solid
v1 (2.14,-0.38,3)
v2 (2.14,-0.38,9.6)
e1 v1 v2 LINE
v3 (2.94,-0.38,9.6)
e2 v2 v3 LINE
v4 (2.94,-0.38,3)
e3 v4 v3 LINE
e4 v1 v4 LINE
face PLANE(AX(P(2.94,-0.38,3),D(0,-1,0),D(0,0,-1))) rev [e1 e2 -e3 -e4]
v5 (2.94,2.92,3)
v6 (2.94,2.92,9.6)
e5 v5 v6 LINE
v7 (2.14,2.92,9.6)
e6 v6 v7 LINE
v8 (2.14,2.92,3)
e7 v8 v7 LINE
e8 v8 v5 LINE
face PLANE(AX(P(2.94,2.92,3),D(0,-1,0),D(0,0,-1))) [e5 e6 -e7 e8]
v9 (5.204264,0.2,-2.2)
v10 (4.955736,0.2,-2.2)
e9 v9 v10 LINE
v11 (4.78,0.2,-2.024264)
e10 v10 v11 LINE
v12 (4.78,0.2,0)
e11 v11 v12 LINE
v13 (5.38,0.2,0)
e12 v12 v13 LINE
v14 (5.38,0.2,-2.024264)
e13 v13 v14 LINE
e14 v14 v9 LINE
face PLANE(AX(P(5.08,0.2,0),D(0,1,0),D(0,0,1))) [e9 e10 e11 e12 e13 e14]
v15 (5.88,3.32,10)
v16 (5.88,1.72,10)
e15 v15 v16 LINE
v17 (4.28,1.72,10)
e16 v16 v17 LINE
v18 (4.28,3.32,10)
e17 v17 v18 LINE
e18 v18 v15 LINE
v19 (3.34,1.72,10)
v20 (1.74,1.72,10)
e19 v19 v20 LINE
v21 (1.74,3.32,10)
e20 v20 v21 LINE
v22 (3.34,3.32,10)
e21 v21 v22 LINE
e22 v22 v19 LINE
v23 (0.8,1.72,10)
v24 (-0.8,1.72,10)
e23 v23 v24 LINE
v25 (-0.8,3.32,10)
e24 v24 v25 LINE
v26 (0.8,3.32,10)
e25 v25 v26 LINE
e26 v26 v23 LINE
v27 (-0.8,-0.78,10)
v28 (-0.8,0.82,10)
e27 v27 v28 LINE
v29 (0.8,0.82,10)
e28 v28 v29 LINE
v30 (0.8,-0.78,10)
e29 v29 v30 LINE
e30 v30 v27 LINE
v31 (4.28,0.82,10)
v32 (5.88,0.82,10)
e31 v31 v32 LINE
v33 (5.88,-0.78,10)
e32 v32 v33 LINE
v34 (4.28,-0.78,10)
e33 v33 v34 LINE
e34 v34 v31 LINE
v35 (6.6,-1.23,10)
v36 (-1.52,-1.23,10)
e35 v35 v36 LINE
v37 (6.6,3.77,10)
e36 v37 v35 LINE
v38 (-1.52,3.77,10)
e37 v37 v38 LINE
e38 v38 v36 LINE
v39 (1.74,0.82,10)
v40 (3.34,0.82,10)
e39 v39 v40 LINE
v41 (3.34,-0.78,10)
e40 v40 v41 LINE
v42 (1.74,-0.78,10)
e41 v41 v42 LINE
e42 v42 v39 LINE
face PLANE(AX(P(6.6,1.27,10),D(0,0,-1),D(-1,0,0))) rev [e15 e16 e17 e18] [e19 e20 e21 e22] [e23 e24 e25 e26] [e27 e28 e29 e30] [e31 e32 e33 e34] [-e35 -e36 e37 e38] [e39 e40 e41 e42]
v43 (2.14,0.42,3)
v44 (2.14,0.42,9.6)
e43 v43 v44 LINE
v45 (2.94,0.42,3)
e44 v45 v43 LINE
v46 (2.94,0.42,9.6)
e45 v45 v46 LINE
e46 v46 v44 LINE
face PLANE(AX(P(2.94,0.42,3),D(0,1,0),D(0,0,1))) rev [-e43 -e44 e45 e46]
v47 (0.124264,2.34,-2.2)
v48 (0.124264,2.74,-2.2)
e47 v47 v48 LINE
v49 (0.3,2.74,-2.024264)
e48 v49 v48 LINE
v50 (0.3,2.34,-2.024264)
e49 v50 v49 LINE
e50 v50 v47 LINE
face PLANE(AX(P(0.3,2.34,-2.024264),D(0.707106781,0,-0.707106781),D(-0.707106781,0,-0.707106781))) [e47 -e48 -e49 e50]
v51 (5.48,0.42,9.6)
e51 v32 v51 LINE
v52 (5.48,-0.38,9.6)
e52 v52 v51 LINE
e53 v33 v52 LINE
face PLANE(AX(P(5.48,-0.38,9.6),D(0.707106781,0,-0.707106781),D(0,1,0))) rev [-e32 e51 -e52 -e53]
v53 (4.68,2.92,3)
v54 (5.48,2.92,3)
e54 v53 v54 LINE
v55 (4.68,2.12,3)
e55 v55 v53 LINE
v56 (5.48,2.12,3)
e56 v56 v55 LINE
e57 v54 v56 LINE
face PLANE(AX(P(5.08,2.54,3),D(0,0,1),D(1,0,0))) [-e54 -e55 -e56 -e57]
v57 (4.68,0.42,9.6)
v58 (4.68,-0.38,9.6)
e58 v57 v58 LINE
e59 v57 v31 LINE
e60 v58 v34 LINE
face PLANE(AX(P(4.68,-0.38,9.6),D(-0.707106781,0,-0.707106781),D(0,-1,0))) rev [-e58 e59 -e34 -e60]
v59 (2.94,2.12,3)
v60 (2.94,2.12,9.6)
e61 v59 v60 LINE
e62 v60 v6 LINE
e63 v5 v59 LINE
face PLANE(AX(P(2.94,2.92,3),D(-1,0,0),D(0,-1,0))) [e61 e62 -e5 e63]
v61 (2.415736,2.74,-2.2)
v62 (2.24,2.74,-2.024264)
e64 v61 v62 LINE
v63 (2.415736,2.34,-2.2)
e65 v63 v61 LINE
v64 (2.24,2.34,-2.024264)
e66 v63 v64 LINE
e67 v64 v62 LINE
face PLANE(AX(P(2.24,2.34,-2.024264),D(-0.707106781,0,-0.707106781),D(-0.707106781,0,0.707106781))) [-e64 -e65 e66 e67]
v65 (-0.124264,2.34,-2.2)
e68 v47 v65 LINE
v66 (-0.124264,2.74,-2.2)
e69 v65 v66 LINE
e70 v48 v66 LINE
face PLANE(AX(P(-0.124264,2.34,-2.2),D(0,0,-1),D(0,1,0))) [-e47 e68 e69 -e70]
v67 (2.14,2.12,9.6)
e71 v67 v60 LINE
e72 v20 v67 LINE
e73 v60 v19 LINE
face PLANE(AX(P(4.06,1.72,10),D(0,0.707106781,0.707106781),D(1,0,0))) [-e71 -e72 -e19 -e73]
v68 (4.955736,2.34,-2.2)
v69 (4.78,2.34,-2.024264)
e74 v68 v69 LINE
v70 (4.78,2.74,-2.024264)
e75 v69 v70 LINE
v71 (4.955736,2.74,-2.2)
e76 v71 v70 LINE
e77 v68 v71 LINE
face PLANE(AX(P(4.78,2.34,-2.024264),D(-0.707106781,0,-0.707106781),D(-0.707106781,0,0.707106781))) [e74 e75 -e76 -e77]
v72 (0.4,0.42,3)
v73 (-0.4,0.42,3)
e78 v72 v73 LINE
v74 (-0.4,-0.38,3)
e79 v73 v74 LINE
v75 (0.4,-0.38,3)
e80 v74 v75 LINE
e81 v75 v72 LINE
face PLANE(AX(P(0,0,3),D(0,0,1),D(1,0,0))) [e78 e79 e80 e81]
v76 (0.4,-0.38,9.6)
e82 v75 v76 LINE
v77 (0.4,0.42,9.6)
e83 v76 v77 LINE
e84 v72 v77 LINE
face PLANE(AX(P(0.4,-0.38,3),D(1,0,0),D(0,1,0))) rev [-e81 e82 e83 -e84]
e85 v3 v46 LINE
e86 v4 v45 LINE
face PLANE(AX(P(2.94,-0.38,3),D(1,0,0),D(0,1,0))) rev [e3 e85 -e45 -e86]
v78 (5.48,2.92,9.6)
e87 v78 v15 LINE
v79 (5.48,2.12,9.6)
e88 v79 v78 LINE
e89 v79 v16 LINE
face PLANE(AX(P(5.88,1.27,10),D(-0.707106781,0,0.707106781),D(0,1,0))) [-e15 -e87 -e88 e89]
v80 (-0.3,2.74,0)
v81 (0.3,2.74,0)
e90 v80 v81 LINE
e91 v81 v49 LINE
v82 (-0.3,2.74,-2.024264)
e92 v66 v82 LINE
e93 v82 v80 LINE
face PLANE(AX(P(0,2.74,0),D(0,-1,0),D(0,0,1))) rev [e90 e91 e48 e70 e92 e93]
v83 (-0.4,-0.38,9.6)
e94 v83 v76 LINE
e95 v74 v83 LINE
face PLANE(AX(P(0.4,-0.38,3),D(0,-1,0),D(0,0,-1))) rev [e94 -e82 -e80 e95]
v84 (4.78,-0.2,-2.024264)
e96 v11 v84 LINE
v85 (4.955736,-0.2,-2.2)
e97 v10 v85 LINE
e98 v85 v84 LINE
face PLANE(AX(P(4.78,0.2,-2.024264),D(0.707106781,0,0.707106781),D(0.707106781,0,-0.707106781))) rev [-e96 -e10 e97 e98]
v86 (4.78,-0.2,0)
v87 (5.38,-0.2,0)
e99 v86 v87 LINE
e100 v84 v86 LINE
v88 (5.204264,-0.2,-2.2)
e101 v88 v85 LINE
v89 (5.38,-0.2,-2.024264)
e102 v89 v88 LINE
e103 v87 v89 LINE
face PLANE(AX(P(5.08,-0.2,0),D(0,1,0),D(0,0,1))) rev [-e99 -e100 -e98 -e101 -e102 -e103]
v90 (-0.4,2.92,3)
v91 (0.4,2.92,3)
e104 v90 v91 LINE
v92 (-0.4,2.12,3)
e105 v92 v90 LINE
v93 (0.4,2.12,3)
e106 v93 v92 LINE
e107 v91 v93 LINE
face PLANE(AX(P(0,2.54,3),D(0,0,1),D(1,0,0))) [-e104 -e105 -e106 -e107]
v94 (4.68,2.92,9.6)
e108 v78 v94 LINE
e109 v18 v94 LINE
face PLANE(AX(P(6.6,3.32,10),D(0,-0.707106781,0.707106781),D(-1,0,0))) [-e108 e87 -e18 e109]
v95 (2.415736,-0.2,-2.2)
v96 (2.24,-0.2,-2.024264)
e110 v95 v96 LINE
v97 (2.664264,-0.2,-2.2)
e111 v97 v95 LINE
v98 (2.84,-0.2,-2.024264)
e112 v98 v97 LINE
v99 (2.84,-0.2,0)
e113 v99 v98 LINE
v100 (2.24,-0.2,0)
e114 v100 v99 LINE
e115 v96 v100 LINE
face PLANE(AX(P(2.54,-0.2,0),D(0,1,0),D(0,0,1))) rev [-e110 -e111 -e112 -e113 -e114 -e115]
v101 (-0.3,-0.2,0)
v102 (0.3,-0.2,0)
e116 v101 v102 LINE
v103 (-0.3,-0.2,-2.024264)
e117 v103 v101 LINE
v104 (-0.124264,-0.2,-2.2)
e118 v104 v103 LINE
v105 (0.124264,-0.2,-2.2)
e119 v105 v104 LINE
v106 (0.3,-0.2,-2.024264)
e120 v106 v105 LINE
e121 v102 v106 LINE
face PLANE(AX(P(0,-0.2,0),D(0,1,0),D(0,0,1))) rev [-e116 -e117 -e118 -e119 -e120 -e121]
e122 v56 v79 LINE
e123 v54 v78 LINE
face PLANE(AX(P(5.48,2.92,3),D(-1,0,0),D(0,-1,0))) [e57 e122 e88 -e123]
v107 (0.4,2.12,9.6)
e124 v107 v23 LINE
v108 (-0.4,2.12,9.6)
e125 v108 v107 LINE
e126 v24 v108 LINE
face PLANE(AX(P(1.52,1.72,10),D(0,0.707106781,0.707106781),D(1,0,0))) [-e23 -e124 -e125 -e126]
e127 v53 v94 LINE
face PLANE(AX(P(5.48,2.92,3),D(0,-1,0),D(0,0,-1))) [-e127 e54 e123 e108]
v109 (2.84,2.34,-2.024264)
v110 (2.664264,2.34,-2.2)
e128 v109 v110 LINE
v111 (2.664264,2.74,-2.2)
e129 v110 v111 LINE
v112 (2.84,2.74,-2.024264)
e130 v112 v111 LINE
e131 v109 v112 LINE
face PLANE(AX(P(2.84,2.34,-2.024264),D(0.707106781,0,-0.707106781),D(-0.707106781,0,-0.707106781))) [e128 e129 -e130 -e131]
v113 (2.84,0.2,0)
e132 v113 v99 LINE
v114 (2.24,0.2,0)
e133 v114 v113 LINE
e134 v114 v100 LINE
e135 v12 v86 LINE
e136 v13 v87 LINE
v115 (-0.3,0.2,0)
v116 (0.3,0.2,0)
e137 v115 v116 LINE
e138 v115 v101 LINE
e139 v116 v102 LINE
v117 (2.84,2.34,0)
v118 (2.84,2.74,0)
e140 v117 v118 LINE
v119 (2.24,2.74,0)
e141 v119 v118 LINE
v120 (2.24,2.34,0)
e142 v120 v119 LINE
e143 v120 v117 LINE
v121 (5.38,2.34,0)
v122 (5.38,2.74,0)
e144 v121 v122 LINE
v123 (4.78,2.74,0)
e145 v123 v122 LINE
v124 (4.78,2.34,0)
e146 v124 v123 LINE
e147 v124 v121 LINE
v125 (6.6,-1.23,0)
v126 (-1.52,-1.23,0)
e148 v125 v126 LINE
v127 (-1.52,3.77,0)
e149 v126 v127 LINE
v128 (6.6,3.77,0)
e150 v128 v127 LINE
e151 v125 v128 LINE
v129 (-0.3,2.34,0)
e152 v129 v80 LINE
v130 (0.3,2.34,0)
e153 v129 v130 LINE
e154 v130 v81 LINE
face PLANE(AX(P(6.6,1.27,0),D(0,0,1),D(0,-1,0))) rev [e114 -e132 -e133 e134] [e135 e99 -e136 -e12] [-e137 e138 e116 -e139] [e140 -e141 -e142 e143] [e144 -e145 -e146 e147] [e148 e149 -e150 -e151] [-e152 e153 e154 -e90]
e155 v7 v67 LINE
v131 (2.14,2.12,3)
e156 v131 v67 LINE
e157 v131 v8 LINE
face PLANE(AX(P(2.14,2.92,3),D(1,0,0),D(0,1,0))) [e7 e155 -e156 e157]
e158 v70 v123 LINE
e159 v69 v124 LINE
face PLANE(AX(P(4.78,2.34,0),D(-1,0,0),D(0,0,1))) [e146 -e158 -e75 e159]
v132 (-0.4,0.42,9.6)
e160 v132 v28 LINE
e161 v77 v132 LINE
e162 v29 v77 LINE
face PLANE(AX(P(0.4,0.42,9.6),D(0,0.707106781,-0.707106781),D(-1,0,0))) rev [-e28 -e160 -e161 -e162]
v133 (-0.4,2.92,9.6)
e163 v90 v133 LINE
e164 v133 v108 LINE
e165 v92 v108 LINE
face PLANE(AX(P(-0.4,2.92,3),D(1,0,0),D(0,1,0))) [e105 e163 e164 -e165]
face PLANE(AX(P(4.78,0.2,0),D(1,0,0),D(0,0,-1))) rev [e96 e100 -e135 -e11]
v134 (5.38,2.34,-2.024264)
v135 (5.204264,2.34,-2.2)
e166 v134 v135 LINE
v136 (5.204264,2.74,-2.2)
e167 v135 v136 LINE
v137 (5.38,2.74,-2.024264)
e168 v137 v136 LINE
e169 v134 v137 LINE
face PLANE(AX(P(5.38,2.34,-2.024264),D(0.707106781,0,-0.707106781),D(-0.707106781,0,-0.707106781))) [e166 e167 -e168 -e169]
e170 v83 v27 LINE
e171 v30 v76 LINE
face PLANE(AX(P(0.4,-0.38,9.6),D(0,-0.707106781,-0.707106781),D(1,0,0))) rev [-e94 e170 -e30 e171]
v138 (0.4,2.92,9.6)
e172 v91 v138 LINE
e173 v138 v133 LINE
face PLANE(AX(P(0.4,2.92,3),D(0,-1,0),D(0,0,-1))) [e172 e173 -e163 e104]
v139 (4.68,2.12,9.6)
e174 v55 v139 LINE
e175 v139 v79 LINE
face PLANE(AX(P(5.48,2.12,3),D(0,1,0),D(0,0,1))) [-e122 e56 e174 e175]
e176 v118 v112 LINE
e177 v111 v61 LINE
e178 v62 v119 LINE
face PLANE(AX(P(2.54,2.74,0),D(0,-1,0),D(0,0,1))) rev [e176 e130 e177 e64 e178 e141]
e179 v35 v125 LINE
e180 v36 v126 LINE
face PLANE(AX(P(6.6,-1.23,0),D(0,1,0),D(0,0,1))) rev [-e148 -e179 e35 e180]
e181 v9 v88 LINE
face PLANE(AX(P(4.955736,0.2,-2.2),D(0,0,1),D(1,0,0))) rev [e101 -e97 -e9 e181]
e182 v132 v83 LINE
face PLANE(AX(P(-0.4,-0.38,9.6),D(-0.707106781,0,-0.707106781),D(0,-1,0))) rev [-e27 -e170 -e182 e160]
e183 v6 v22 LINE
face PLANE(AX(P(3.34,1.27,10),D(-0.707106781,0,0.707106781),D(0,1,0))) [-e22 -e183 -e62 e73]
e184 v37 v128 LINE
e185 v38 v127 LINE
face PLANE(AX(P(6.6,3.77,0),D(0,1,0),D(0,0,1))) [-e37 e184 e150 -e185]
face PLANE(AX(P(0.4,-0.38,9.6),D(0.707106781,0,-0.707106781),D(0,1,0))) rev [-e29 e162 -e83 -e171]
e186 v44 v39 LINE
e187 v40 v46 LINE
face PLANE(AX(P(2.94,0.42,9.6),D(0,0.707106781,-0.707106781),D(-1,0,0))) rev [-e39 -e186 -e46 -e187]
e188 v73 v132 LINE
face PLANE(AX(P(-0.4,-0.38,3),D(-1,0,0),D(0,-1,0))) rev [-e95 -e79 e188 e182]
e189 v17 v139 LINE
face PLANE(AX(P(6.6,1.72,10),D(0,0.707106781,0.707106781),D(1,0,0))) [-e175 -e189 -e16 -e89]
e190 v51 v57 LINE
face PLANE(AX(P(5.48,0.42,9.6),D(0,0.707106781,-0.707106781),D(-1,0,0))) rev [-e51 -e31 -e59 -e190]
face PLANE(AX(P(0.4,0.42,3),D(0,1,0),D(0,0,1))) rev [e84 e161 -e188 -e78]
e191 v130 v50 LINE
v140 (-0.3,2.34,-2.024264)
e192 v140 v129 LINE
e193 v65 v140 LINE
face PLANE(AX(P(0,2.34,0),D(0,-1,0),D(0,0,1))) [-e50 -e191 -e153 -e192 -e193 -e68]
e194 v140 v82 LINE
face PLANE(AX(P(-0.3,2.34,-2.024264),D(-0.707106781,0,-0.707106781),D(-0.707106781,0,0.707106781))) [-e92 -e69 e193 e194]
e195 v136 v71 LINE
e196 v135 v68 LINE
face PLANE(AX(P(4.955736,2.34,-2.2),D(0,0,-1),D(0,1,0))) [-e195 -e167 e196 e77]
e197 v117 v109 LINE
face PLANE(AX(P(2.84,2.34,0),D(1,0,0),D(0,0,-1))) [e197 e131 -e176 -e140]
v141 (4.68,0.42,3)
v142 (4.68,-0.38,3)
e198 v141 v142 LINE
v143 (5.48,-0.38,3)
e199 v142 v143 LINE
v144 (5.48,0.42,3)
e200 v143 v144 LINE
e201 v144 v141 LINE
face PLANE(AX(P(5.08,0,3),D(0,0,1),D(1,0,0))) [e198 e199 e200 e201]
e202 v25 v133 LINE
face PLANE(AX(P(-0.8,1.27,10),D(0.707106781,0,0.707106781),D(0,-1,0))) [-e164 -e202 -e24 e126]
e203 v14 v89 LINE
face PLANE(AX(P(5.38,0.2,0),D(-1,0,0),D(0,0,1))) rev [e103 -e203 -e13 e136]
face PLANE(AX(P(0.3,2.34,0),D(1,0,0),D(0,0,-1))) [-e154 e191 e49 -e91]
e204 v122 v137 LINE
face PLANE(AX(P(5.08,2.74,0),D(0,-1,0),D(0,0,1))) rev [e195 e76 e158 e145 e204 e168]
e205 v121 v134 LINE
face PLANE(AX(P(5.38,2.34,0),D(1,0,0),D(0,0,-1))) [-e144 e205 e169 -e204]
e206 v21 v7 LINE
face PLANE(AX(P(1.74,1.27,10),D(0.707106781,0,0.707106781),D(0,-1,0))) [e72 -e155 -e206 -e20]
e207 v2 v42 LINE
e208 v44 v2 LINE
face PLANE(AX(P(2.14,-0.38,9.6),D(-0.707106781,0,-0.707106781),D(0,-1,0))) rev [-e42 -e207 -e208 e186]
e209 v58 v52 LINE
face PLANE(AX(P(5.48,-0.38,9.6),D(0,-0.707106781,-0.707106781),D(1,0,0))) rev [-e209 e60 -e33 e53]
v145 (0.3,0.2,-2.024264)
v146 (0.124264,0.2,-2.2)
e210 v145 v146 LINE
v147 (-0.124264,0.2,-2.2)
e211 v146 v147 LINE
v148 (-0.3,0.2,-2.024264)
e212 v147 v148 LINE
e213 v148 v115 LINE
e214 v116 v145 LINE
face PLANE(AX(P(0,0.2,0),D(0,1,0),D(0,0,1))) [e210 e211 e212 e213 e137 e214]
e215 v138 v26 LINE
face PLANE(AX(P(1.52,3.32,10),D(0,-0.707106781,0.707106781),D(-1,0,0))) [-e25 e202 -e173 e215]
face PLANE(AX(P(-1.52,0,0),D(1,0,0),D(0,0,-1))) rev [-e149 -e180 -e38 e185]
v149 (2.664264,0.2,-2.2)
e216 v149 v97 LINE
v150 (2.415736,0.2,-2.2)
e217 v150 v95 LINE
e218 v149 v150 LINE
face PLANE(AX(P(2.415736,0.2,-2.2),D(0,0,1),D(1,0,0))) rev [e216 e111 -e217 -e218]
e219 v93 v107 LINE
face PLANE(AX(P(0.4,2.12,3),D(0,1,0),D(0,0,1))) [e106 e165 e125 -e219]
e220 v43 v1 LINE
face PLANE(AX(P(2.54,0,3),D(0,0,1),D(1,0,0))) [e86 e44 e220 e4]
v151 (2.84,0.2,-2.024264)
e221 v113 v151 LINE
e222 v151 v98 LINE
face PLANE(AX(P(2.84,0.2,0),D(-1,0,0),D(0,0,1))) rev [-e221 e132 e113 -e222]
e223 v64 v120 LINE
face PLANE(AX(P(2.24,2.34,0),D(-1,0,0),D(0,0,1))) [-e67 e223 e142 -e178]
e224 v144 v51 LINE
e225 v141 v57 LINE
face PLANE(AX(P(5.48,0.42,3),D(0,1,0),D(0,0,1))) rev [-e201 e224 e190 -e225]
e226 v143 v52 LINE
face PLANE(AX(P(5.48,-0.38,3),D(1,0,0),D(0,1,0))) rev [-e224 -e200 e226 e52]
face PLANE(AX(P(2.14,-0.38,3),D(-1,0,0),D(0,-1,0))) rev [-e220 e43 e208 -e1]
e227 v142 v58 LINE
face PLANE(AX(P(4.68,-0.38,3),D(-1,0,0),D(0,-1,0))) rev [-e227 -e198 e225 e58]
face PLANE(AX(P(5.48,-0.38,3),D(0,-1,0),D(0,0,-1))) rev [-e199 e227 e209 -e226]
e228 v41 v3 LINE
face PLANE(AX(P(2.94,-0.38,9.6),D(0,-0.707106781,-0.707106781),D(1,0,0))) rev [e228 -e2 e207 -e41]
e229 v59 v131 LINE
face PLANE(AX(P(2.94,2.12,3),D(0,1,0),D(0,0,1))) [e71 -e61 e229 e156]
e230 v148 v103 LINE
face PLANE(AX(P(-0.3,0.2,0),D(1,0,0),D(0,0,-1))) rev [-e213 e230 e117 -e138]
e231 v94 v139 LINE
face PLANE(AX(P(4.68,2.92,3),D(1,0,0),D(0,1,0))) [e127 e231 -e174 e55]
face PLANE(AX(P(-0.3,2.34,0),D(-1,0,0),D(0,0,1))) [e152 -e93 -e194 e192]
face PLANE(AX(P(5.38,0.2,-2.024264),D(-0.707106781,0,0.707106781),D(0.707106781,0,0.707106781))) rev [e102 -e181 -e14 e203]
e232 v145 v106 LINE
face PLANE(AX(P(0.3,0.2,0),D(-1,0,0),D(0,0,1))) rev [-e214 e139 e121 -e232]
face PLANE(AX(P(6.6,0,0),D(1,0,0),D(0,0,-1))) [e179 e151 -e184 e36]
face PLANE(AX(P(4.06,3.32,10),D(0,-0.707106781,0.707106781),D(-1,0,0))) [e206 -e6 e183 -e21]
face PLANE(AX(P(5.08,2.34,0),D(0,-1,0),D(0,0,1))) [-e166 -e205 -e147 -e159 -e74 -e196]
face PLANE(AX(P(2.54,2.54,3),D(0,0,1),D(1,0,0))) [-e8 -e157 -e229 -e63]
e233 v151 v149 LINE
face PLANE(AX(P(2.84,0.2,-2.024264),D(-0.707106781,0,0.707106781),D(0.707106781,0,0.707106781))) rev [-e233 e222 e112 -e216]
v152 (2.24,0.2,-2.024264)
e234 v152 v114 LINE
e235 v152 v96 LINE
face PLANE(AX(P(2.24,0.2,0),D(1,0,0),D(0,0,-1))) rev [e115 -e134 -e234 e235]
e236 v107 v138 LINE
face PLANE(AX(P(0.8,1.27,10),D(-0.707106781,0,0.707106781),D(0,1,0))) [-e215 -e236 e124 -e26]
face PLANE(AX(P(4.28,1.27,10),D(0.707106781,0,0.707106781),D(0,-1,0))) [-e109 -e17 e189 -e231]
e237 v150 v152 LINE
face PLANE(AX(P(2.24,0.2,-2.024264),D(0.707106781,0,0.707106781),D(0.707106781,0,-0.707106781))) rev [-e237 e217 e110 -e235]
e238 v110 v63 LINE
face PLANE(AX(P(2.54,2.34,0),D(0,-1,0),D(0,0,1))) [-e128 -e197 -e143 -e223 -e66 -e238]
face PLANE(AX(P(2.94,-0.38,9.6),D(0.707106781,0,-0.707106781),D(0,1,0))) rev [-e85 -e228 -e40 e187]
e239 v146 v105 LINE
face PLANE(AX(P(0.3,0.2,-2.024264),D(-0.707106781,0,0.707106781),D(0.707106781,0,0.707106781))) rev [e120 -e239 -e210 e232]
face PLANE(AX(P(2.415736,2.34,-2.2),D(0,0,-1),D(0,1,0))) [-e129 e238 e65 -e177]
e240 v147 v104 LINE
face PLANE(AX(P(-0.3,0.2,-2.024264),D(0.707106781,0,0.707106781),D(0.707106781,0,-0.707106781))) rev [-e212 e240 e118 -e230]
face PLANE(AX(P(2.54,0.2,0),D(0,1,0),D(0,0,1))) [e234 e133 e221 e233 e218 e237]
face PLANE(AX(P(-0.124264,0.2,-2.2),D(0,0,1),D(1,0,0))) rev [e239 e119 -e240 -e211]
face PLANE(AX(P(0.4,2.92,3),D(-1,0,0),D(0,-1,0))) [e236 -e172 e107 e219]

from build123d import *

# Parameters (mm, degrees)
SKETCH1_W            = 2.5
SKETCH1_H            = 10
BOSS_EXTRUDE1_DEPTH  = 1.52
SKETCH2_W            = 0.8
SKETCH2_H            = 0.8
CUT_EXTRUDE1_DEPTH   = 7
CHAMFER_1_SIZE       = 0.4
BOSS_EXTRUDE2_DEPTH  = 0.2
MIRROR_START         = -1.52
MIRROR_1_DEPTH       = 3.04
MIRROR_1_2_DEPTH     = 0.72
MIRROR_START_2       = 0.8
MIRROR_1_3_DEPTH     = 0.72
MIRROR_START_3       = -0.124264069
MIRROR_1_4_OUTLINE_W = 0.4
MIRROR_1_4_OUTLINE_H = 2.2
MIRROR_1_4_DEPTH     = 0.248528138
MIRROR_START_4       = 1
MIRROR_1_5_DEPTH     = 2.32
MIRROR_START_5       = 2.34
MIRROR_1_6_DEPTH     = 0.4
LPATTERN1_COUNT      = 3
LPATTERN1_PITCH      = 2.54


with BuildPart() as part:
    # Sketch1 → Boss-Extrude1 (new, symmetric)
    with BuildSketch(Plane(origin=(0, 0, 0), x_dir=(0, -1, 0), z_dir=(1, 0, 0))):
        with Locations((-0.02, -5)):
            Rectangle(SKETCH1_W, SKETCH1_H)
    extrude(amount=BOSS_EXTRUDE1_DEPTH, both=True)

    # Sketch2 → Cut-Extrude1 (cut)
    with BuildSketch(Plane(origin=(0, 0, 10), x_dir=(-1, 0, 0), z_dir=(0, 0, 1))):
        with Locations((0, -0.02)):
            Rectangle(SKETCH2_W, SKETCH2_H)
    extrude(amount=-CUT_EXTRUDE1_DEPTH, mode=Mode.SUBTRACT)

    # Фаска1
    chamfer_1_edges = [part.edges().sort_by_distance(p)[0] for p in [
        (-0.4, 0.02, 10),
        (0, -0.38, 10),
        (0.4, 0.02, 10),
        (0, 0.42, 10),
    ]]
    chamfer(chamfer_1_edges, length=CHAMFER_1_SIZE)

    # Sketch3 → Boss-Extrude2 (add, symmetric)
    with BuildSketch(Plane(origin=(0, 0, 0), x_dir=(1, 0, 0), z_dir=(0, 1, 0))):
        Polygon((-0.3, 0), (-0.3, 2.024264069), (-0.124264069, 2.2), (0.124264069, 2.2), (0.3, 2.024264069), (0.3, 0), align=None)
    extrude(amount=BOSS_EXTRUDE2_DEPTH, both=True)

    # Зеркальное отражение1: read off the stored shape, not the designer's step
    # Зеркальное отражение1 outline → Зеркальное отражение1 (add)
    with BuildSketch(Plane.YZ.offset(MIRROR_START)):
        Polygon((1.72, 10), (1.27, 10), (1.27, 0), (3.77, 0), (3.77, 10), (3.32, 10), (2.92, 9.6), (2.92, 3), (2.12, 3), (2.12, 9.6), align=None)
    extrude(amount=MIRROR_1_DEPTH)

    # Mirror 1 2 outline → Mirror 1 2 (add)
    with BuildSketch(Plane.YZ.offset(MIRROR_START)):
        Polygon((3.32, 10), (1.72, 10), (2.12, 9.6), (2.12, 3), (2.92, 3), (2.92, 9.6), align=None)
    extrude(amount=MIRROR_1_2_DEPTH)

    # Mirror 1 3 outline → Mirror 1 3 (add)
    with BuildSketch(Plane.YZ.offset(MIRROR_START_2)):
        Polygon((3.32, 10), (1.72, 10), (2.12, 9.6), (2.12, 3), (2.92, 3), (2.92, 9.6), align=None)
    extrude(amount=MIRROR_1_3_DEPTH)

    # Mirror 1 4 outline → Mirror 1 4 (add)
    with BuildSketch(Plane.YZ.offset(MIRROR_START_3)):
        with Locations((2.54, -1.1)):
            Rectangle(MIRROR_1_4_OUTLINE_W, MIRROR_1_4_OUTLINE_H)
    extrude(amount=MIRROR_1_4_DEPTH)

    # Mirror 1 5 outline → Mirror 1 5 (add)
    with BuildSketch(Plane(origin=(0, 0, 0), x_dir=(1, 0, 0), z_dir=(0, 1, 0)).offset(MIRROR_START_4)):
        Polygon((-0.8, -10), (-0.4, -9.6), (-0.4, -3), (-0.8, -3), align=None)
        Polygon((0.8, -3), (0.4, -3), (0.4, -9.6), (0.8, -10), align=None)
    extrude(amount=MIRROR_1_5_DEPTH)

    # Mirror 1 6 outline → Mirror 1 6 (add)
    with BuildSketch(Plane(origin=(0, 0, 0), x_dir=(1, 0, 0), z_dir=(0, 1, 0)).offset(MIRROR_START_5)):
        Polygon((0.124264069, 0), (0.3, 0), (0.3, 2.024264069), (0.124264069, 2.2), align=None)
        Polygon((-0.3, 0), (-0.124264069, 0), (-0.124264069, 2.2), (-0.3, 2.024264069), align=None)
    extrude(amount=MIRROR_1_6_DEPTH)


with BuildPart() as lpattern1_1:
    # LPattern1: pattern copy
    add(part.part.moved(Location(Vector(1, 0, 0) * (1 * LPATTERN1_PITCH))))


with BuildPart() as lpattern1_2:
    # LPattern1: pattern copy
    add(part.part.moved(Location(Vector(1, 0, 0) * (2 * LPATTERN1_PITCH))))

    # Combine 1: union LPattern1_1, part
    add(lpattern1_1.part)
    add(part.part)


solid = lpattern1_2.part
